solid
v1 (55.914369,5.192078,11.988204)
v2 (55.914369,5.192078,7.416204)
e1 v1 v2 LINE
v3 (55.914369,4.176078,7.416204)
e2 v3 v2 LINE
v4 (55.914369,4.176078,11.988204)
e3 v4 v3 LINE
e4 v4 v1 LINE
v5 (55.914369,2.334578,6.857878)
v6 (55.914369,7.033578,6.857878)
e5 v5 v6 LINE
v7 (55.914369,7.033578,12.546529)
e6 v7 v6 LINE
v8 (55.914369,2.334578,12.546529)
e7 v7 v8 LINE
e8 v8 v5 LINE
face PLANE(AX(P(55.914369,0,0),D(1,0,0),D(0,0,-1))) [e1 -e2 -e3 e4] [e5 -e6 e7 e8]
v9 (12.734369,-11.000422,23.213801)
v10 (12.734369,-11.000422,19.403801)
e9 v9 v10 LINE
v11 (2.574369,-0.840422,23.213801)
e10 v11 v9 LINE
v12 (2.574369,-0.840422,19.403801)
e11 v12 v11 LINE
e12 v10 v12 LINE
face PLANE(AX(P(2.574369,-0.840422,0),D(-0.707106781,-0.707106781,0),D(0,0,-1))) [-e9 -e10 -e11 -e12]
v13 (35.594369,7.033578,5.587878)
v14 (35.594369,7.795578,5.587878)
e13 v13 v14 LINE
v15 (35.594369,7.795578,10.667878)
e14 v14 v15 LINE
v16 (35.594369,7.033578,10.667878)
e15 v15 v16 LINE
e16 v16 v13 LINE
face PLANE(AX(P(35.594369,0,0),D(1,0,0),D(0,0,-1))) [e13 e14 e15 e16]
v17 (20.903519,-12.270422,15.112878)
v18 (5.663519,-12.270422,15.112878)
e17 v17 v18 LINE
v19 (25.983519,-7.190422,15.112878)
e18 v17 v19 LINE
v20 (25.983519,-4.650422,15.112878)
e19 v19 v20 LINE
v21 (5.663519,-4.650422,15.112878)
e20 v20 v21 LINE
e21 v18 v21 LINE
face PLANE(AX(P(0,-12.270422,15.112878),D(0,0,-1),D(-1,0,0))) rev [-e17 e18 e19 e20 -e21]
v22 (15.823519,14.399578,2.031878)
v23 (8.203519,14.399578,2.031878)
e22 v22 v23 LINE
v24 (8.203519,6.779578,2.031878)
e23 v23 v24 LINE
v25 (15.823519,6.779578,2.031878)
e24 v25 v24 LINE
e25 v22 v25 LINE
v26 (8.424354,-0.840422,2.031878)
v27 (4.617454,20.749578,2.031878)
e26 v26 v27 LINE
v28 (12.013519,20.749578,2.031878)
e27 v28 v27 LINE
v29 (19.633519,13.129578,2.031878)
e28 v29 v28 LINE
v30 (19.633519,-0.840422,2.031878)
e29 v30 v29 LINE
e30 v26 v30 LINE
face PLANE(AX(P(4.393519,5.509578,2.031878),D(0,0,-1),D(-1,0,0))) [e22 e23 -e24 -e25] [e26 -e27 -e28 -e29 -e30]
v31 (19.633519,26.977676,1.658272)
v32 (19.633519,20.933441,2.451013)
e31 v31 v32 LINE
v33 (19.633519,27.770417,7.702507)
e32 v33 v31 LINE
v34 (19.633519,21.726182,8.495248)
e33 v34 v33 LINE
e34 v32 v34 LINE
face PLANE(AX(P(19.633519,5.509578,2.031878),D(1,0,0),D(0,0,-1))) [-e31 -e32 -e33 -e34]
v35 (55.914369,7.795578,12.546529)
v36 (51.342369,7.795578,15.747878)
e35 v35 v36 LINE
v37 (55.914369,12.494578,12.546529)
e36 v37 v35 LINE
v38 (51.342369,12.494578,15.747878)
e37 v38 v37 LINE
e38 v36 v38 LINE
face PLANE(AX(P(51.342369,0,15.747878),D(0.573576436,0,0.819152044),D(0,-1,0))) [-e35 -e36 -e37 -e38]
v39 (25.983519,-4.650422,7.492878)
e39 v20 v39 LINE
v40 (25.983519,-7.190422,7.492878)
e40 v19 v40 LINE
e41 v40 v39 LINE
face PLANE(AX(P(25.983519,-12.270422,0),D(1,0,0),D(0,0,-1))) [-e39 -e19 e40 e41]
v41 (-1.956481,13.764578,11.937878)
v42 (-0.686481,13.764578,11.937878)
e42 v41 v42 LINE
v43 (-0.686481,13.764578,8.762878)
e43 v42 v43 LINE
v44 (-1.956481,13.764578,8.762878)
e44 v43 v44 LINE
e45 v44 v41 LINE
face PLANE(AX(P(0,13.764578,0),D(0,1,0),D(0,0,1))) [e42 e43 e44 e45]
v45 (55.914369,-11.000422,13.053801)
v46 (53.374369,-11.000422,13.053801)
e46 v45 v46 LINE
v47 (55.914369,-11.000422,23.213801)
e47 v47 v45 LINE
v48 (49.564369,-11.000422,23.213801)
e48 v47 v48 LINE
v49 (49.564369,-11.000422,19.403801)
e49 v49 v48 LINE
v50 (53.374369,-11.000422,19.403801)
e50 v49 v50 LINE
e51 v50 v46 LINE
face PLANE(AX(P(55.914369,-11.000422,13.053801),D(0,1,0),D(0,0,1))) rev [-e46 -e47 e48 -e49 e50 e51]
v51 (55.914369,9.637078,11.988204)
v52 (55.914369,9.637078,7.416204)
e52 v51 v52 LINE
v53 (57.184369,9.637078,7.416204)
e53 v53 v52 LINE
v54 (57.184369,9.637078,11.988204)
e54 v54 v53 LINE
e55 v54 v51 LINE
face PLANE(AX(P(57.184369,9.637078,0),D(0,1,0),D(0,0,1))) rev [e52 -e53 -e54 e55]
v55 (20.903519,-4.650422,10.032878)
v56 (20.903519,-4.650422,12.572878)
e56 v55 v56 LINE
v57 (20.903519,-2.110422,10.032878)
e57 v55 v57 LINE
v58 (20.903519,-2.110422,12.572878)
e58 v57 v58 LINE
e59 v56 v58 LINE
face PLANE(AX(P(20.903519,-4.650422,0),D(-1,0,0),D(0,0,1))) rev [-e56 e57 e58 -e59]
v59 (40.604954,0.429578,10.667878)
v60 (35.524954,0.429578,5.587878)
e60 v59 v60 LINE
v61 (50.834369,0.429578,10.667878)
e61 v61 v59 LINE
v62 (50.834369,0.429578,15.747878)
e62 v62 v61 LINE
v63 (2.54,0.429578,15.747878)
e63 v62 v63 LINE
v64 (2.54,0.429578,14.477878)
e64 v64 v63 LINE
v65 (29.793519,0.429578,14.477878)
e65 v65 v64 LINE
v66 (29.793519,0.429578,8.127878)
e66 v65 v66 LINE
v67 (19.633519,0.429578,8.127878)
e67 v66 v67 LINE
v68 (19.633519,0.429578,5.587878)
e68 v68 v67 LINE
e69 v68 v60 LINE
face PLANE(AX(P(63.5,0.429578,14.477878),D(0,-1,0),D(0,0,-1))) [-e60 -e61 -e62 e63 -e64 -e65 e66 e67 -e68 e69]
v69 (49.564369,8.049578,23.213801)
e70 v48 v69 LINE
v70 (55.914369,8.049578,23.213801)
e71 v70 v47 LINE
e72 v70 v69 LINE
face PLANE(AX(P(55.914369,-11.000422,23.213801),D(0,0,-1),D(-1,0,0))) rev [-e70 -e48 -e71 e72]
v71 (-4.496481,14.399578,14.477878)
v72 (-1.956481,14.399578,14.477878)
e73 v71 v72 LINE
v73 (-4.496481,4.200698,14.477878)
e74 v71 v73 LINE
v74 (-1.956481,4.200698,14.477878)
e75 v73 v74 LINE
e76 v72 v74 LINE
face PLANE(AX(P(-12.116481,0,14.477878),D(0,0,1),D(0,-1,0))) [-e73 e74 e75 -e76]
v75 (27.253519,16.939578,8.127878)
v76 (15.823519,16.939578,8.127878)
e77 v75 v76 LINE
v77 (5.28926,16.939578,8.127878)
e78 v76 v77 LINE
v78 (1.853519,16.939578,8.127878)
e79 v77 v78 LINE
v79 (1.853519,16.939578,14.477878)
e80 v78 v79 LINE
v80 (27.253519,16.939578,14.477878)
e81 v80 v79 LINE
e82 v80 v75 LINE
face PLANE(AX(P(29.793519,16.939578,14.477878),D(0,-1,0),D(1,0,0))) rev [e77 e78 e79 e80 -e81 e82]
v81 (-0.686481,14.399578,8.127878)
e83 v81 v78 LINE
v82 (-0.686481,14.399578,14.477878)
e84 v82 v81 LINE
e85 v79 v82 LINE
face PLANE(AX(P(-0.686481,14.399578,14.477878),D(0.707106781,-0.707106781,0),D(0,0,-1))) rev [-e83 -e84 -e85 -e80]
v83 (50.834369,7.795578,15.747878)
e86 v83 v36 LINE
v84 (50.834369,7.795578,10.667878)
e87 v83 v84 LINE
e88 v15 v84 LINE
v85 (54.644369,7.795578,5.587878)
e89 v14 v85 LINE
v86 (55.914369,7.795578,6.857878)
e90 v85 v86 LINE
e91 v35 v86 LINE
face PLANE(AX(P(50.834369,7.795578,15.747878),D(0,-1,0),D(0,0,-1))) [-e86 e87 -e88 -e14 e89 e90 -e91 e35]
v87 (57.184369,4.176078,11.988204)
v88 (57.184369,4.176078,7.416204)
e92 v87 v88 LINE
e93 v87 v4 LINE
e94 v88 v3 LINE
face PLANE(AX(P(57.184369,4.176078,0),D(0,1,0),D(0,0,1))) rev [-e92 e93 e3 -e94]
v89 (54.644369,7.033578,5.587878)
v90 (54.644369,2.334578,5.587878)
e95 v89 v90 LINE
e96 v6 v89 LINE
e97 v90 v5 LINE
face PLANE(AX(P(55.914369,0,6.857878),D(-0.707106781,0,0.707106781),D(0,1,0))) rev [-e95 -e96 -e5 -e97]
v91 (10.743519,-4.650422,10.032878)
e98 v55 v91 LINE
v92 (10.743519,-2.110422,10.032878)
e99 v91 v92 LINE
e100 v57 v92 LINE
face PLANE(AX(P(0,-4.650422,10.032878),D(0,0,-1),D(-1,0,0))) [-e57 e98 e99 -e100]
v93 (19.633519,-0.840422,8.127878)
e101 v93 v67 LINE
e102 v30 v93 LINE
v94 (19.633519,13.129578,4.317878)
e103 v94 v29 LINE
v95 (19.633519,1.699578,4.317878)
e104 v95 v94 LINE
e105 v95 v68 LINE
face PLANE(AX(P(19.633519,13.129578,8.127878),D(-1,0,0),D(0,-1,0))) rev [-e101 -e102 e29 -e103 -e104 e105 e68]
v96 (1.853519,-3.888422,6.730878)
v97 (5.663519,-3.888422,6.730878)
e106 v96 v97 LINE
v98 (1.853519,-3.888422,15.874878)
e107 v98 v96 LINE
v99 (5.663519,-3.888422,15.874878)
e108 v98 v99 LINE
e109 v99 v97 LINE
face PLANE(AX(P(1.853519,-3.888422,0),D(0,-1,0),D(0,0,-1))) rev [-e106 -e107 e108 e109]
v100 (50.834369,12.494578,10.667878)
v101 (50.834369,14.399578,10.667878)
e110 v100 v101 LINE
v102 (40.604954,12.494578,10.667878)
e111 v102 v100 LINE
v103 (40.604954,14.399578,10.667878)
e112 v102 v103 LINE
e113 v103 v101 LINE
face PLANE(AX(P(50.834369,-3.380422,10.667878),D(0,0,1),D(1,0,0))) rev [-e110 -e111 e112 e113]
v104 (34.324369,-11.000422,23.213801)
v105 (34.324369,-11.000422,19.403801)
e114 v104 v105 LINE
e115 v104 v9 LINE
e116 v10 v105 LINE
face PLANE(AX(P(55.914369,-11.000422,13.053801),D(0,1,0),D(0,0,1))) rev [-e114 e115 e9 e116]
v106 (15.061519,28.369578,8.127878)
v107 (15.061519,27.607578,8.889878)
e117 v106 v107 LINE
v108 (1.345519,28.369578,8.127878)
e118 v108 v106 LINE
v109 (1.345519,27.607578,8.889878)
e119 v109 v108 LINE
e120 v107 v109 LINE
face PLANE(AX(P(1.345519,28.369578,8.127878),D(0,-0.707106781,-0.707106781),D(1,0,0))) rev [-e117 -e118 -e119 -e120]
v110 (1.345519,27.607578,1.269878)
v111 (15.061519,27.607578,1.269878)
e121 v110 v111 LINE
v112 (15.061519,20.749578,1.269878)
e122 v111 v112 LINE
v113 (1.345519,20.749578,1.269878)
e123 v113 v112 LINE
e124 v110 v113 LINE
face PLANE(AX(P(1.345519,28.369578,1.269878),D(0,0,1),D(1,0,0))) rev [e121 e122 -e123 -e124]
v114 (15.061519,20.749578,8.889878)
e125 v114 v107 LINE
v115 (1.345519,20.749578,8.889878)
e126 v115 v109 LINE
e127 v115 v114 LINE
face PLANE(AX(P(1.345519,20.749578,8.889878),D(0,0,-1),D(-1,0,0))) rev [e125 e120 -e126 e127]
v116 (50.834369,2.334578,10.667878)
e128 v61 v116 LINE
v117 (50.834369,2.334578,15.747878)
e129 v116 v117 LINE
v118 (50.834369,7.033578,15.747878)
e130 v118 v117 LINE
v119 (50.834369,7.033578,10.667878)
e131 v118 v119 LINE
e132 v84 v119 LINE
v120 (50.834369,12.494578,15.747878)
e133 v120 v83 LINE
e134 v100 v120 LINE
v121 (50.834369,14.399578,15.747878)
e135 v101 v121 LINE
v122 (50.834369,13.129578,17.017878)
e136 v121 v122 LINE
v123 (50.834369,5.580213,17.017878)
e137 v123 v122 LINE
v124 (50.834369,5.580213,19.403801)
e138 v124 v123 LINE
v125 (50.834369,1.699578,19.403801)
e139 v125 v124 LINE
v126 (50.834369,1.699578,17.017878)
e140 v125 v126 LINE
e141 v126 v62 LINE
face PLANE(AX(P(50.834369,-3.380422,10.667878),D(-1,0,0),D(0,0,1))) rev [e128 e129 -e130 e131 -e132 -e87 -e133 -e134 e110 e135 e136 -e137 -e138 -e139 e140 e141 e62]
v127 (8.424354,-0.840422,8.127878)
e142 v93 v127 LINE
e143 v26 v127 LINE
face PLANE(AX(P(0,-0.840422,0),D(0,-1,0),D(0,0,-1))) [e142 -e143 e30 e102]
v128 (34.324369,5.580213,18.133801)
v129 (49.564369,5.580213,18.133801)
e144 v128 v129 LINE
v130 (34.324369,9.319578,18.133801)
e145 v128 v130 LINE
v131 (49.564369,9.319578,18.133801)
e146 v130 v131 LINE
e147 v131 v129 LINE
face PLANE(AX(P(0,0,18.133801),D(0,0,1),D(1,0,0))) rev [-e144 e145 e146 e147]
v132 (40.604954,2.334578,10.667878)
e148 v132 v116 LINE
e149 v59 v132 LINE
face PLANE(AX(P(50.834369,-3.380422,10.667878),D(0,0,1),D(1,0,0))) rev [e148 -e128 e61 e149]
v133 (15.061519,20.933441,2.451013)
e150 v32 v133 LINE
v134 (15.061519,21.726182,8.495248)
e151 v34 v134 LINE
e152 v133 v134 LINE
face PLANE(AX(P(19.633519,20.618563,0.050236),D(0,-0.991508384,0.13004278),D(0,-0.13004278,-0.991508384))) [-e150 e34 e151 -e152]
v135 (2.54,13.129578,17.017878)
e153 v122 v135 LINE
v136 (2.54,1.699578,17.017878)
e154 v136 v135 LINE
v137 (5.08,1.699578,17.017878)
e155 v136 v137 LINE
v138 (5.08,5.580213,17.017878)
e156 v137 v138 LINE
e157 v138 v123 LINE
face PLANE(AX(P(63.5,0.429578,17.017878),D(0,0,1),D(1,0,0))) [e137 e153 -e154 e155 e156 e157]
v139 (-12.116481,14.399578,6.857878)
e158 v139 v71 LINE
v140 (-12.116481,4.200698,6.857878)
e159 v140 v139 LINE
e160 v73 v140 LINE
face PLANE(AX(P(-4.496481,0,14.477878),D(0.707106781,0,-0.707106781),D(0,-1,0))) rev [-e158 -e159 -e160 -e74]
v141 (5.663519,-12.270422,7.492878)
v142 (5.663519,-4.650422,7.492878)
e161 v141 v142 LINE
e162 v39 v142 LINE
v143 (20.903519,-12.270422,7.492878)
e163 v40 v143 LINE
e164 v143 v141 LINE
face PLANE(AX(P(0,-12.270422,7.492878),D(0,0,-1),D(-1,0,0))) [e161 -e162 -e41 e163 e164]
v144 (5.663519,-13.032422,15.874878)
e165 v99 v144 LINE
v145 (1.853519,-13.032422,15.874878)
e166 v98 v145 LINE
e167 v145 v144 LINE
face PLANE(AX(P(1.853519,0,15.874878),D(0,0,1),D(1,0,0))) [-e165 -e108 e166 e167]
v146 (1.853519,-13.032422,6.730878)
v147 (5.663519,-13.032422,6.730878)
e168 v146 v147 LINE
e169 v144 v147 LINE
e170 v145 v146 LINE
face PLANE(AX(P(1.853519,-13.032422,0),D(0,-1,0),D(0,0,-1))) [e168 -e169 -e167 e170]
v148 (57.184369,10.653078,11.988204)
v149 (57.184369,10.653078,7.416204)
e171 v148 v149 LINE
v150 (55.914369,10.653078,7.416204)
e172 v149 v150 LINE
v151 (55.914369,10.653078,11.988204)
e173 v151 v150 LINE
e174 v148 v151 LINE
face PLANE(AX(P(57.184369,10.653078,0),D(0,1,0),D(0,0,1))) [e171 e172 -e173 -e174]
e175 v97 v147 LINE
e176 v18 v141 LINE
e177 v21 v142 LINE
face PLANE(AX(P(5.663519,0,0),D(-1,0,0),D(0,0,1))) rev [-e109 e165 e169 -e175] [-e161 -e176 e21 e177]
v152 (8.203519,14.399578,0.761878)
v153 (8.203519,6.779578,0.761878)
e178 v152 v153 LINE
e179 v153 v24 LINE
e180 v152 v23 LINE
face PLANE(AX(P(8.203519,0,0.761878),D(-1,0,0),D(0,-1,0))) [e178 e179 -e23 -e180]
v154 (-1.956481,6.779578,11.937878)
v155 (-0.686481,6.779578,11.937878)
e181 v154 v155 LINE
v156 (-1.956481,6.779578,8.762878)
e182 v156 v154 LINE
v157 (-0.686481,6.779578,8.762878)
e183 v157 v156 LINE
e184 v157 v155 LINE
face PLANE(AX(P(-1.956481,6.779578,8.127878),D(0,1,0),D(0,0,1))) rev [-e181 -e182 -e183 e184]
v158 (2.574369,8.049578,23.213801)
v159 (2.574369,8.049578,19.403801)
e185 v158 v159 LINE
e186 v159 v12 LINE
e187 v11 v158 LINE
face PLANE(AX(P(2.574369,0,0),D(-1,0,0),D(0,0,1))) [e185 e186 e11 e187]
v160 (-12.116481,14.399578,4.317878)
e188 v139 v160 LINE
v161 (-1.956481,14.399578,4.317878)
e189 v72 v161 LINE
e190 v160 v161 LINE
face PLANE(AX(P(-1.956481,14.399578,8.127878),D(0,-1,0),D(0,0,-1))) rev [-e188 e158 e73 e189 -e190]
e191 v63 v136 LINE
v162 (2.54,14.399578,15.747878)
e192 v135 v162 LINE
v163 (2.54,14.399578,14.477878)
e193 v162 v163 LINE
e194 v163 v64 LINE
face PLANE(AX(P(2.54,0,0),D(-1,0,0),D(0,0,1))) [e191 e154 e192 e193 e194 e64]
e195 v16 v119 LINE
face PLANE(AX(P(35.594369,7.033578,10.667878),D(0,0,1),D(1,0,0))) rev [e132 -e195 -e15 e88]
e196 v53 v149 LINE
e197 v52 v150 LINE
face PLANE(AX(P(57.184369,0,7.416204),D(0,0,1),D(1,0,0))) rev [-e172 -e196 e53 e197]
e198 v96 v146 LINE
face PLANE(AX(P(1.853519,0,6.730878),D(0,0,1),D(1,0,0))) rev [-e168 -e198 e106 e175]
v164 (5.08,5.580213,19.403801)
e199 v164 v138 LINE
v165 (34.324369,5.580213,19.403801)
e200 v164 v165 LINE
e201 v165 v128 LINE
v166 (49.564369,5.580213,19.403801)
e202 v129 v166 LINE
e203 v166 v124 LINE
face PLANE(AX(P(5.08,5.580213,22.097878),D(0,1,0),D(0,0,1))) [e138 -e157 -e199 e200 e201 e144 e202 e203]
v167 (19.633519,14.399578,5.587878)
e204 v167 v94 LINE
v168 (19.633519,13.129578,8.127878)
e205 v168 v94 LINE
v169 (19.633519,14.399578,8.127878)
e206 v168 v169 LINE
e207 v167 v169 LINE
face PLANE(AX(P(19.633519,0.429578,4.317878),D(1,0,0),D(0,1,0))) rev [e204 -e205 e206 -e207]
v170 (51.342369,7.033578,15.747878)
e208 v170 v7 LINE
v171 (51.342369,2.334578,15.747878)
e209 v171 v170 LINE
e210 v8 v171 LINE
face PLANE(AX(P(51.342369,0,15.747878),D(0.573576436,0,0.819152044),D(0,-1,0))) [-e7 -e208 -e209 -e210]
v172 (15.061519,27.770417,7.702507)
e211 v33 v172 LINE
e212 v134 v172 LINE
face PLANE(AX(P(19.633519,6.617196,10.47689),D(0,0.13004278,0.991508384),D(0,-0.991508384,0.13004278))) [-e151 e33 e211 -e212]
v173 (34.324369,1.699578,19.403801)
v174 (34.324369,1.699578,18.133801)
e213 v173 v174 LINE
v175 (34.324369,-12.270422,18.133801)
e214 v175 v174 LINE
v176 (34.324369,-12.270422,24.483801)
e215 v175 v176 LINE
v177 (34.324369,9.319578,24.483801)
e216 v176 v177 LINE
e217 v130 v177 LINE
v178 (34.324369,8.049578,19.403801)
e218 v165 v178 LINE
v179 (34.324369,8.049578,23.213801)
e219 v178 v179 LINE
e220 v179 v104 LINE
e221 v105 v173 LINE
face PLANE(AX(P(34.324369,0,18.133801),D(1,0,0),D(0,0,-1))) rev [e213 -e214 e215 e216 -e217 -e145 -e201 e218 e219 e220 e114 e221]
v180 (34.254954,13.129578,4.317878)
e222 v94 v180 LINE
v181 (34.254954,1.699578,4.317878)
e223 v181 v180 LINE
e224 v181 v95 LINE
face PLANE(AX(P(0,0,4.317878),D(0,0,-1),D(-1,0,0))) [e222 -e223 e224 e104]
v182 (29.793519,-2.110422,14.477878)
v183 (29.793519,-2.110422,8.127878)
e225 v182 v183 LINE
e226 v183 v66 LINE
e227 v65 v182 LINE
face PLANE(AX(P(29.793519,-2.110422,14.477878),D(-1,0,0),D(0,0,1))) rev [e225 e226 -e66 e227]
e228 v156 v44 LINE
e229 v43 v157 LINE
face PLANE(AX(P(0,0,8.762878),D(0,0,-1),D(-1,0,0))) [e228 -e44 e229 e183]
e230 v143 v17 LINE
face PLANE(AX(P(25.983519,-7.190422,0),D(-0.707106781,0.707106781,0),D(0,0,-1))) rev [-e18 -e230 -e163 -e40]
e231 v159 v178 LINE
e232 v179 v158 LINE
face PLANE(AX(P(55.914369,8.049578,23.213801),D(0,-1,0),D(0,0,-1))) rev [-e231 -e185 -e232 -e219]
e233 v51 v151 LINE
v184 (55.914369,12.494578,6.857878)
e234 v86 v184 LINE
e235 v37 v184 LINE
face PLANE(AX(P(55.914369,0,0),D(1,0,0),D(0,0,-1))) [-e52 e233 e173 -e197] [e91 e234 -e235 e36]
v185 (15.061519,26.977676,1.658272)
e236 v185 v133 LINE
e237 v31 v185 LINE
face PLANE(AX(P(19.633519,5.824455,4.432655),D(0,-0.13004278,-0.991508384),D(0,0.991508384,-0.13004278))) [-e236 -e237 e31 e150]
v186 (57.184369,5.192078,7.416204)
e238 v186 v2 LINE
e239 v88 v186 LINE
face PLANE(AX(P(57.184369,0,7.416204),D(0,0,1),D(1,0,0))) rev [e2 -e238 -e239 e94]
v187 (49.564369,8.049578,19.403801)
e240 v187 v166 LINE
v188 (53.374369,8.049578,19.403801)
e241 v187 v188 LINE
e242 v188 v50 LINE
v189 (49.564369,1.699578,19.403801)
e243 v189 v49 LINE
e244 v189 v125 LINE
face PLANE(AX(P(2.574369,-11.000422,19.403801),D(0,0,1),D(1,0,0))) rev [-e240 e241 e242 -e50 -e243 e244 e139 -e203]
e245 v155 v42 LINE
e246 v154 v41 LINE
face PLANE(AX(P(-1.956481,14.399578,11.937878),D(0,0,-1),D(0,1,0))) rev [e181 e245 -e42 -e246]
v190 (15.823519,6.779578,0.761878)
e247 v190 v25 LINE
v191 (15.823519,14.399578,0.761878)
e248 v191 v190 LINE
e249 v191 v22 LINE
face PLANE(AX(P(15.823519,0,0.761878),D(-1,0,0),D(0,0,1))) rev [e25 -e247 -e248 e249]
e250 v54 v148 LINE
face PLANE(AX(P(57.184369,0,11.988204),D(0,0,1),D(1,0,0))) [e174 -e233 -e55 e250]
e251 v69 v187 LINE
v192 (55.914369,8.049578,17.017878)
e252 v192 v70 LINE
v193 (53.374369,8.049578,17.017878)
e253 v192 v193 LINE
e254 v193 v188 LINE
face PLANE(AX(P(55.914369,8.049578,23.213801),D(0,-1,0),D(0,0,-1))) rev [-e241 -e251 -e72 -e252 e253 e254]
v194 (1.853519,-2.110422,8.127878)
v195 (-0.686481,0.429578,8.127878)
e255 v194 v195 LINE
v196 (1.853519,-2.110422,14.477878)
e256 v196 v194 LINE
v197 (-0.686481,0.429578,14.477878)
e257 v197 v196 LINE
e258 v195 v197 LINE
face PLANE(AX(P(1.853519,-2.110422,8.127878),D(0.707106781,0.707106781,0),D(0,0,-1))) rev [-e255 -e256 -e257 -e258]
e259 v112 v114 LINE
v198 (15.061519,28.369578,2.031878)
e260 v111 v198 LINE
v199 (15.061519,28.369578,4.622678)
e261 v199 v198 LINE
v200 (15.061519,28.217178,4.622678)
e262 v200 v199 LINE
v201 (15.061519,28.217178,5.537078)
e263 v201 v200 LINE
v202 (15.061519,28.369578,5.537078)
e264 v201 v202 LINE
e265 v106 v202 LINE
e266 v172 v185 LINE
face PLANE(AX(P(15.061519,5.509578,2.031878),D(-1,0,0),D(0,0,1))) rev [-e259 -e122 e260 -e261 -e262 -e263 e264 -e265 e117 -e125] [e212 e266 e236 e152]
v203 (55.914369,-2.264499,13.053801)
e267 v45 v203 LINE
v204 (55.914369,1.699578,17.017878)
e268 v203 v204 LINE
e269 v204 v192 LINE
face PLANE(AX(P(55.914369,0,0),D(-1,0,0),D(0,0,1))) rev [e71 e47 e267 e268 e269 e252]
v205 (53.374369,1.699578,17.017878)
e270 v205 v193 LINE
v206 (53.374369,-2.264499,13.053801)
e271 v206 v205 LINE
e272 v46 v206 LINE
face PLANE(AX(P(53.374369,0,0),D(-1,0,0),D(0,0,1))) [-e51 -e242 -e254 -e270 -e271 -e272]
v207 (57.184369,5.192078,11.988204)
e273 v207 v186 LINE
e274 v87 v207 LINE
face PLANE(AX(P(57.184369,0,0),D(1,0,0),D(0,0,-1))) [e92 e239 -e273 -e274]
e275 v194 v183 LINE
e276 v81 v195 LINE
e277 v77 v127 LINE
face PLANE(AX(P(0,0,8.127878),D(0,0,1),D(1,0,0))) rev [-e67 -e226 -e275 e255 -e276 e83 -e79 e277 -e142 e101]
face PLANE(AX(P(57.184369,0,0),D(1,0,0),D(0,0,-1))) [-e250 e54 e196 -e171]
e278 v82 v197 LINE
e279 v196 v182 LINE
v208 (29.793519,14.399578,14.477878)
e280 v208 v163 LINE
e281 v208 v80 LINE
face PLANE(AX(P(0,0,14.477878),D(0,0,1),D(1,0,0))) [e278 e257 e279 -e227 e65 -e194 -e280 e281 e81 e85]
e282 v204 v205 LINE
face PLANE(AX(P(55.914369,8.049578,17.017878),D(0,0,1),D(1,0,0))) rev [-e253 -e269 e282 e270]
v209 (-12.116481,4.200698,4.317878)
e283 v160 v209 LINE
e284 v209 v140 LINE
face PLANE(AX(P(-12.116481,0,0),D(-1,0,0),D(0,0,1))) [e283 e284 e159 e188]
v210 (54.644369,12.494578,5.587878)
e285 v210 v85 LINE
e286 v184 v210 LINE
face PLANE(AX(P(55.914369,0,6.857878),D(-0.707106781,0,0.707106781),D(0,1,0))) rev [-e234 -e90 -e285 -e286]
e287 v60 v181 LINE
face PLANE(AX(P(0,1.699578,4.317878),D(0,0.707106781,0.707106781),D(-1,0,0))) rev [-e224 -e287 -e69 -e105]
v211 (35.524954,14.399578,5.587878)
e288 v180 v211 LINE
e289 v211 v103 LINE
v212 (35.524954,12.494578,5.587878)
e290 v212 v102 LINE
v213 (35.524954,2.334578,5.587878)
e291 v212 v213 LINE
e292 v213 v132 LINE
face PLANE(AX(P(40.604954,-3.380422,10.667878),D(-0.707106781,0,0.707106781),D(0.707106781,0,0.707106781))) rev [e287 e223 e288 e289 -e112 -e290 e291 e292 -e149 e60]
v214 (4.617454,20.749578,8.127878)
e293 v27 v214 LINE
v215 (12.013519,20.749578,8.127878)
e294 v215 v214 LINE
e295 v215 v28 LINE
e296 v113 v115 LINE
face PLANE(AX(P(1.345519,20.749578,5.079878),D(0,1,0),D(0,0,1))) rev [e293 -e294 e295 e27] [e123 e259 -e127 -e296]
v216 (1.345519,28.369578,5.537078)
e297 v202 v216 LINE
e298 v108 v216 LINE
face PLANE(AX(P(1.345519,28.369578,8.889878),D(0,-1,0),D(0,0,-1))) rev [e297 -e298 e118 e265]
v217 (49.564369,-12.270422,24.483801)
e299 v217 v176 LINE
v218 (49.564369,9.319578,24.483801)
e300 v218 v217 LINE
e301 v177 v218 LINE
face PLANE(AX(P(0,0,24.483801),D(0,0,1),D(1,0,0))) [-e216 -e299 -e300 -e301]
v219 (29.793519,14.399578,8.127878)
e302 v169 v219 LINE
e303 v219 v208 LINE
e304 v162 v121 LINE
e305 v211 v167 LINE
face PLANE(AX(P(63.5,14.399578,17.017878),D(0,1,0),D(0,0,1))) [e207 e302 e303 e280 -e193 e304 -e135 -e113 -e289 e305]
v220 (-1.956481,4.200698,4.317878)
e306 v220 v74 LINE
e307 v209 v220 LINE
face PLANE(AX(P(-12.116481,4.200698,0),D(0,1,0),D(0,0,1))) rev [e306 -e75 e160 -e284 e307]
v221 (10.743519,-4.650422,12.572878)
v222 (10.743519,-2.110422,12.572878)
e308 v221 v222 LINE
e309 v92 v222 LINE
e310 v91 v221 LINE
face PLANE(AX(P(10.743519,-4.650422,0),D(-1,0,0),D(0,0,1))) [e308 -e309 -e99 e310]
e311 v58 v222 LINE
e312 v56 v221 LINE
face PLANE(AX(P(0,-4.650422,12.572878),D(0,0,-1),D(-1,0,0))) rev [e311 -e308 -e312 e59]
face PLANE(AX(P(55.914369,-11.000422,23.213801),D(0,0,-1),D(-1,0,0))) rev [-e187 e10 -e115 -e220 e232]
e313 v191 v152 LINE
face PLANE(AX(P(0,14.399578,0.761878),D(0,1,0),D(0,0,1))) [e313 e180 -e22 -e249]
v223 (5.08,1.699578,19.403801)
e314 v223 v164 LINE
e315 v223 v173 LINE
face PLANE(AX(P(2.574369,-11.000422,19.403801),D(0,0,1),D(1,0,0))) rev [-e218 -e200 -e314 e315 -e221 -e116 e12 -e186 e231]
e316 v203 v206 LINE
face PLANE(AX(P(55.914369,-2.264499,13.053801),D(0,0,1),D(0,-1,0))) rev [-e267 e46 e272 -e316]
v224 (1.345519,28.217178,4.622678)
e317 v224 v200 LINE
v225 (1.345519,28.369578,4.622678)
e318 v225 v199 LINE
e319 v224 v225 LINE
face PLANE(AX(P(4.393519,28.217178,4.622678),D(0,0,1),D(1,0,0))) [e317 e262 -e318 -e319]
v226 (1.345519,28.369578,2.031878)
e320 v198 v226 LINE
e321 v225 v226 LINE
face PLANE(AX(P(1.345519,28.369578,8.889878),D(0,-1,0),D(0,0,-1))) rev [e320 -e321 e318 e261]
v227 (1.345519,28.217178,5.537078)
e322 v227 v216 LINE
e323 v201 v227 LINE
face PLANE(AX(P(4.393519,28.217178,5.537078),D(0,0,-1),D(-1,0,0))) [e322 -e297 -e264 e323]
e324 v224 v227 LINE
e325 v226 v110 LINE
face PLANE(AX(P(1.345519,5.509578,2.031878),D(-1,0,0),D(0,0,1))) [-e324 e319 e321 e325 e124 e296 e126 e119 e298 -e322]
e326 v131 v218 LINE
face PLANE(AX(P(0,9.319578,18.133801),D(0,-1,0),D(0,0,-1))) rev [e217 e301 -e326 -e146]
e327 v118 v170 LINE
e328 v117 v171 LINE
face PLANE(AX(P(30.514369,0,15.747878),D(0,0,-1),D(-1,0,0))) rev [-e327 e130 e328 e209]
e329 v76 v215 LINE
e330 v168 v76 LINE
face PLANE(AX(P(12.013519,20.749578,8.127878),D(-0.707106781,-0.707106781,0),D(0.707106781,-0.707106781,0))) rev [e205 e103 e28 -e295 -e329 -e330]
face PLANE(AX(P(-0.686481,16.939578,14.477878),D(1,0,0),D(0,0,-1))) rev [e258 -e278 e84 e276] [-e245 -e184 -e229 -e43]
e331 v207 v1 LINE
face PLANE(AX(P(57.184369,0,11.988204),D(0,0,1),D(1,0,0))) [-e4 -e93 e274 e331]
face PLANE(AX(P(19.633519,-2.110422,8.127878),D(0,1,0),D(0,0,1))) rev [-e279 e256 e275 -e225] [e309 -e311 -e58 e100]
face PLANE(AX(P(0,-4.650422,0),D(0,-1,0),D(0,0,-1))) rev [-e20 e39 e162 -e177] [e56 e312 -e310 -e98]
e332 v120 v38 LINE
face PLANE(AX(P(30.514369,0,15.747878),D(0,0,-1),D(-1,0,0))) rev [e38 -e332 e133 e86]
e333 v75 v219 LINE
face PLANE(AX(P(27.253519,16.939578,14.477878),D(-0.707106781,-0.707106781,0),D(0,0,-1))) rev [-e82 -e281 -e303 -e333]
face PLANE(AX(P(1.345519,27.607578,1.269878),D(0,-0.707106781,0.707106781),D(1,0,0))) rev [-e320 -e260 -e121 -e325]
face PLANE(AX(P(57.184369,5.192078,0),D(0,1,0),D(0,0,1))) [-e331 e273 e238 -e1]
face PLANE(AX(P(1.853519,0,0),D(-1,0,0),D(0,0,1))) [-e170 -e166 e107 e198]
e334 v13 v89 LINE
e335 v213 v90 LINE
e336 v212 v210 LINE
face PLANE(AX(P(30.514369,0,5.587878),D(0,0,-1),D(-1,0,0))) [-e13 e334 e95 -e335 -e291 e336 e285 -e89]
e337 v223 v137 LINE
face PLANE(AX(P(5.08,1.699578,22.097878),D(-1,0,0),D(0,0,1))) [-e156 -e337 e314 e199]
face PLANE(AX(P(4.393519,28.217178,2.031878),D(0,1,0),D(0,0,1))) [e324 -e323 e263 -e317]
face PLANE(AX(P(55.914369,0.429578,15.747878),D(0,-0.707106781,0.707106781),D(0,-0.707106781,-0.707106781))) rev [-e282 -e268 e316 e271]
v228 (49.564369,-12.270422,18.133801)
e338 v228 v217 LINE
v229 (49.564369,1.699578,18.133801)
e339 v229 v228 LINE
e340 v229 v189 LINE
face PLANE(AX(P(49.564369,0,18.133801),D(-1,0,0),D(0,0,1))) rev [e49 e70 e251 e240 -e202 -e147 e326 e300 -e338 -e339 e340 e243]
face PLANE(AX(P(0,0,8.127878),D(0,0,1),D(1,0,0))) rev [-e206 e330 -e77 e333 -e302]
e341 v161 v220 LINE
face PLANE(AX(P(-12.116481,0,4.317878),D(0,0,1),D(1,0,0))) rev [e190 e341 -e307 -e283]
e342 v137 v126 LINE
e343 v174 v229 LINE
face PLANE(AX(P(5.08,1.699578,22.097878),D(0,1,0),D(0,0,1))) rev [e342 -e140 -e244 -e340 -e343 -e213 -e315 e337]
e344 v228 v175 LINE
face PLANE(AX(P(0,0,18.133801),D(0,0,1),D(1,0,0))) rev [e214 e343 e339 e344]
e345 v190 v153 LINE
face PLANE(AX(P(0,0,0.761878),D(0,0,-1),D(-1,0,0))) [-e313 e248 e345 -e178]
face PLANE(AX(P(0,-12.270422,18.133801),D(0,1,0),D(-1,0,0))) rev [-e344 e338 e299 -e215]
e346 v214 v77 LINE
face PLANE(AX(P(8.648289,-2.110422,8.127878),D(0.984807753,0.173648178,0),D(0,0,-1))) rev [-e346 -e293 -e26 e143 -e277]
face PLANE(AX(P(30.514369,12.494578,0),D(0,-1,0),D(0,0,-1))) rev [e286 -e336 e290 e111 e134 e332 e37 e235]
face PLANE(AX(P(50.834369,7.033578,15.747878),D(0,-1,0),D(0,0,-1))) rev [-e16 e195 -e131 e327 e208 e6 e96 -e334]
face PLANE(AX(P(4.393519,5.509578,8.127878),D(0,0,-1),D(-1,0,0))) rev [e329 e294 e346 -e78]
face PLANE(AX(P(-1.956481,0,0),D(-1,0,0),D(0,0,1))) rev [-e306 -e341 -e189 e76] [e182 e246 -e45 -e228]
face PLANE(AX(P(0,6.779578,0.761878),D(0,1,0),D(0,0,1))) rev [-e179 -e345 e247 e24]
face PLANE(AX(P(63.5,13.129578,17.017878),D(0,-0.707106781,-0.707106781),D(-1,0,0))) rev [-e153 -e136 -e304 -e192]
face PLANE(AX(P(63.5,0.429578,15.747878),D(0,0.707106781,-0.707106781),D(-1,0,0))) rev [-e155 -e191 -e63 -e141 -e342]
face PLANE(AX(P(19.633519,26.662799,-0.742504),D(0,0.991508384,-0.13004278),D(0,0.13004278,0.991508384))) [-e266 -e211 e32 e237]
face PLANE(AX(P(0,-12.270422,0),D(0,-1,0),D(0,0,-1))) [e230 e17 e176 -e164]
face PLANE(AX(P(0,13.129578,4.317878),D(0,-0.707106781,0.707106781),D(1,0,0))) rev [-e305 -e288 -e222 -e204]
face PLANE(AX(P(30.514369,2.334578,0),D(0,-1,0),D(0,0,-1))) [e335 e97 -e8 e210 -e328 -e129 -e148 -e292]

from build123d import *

# Parameters (mm, degrees)
BOSS_EXTRUDE1_DEPTH       = 10.16
BOSS_EXTRUDE2_DEPTH       = 5.08
BOSS_EXTRUDE2_DEPTH_BACK  = 17.78
CHAMFER1_SIZE             = 1.27
BOSS_EXTRUDE3_DEPTH       = 7.62
CUT_EXTRUDE1_DEPTH        = 0.254
SCALE1_SCALE              = 0.6
CHAMFER3_SIZE             = 24.13
CHAMFER3_SIZE_2           = 4.254770044
BOSS_EXTRUDE7_DEPTH       = 6.35
CHAMFER4_SIZE             = 2.54
SKETCH9_W                 = 10.985229955
SKETCH9_H                 = 6.096
SKETCH9_W_2               = 4.255191267
CUT_EXTRUDE4_DEPTH        = 1.27
BOSS_EXTRUDE8_DEPTH       = 63.5
SKETCH12_W                = 0.141876601
SKETCH12_H                = 13.97
SKETCH12_W_2              = 2.398123399
CUT_EXTRUDE7_DEPTH        = 2.54
CHAMFER5_SIZE             = 1.27
SKETCH14_W                = 3.81
SKETCH14_H                = 7.62
BOSS_EXTRUDE9_DEPTH       = 1.27
SKETCH15_W                = 3.81
SKETCH15_H                = 7.62
BOSS_EXTRUDE10_DEPTH      = 10.16
SKETCH16_W                = 1.27
SKETCH16_H                = 7.62
CUT_EXTRUDE8_DEPTH        = 0.635
SKETCH17_W                = 1.27
SKETCH17_H                = 3.175
CUT_EXTRUDE9_DEPTH        = 0.635
CHAMFER6_SIZE             = 7.62
BOSS_EXTRUDE11_DEPTH      = 6.35
SKETCH19_W                = 43.866481186
SKETCH19_H                = 13.97
BOSS_EXTRUDE12_DEPTH      = 10.16
CHAMFER7_SIZE             = 1.27
SKETCH20_W                = 12.665631385
SKETCH20_H                = 5.08
SKETCH20_H_2              = 1.237744284
CUT_EXTRUDE12_DEPTH       = 17.78
SKETCH6_W                 = 7.62
SKETCH6_H                 = 7.62
BOSS_EXTRUDE13_DEPTH      = 1.27
SKETCH21_W                = 12.665631385
SKETCH21_H                = 6.35
CUT_EXTRUDE14_DEPTH       = 17.78
CUT_EXTRUDE15_DEPTH       = 17.78
BOSS_EXTRUDE14_DEPTH      = 2.54
SKETCH25_W                = 3.81
SKETCH25_H                = 19.05
BOSS_EXTRUDE15_DEPTH      = 50.8
CHAMFER8_SIZE             = 10.16
SKETCH26_W                = 45.754368615
SKETCH26_H                = 3.880635149
BOSS_EXTRUDE18_DEPTH      = 5.08
BOSS_EXTRUDE19_DEPTH      = 1.27
BOSS_EXTRUDE19_DEPTH_BACK = 5.08
SKETCH27_W                = 15.24
SKETCH27_H                = 19.05
SKETCH27_H_2              = 1.27
SKETCH28_W                = 10.16
SKETCH28_H                = 1.27
BOSS_EXTRUDE20_DEPTH      = 2.54
SKETCH29_W                = 20.32
SKETCH29_H                = 7.62
BOSS_EXTRUDE21_DEPTH      = 7.62
CHAMFER9_SIZE             = 5.08
SKETCH30_W                = 7.62
SKETCH30_H                = 7.62
BOSS_EXTRUDE22_DEPTH      = 3.81
BOSS_EXTRUDE24_DEPTH      = 5.08
BOSS_EXTRUDE24_DEPTH_BACK = 20.32
SKETCH31_W                = 5.08
SKETCH31_H                = 10.16
SKETCH32_W                = 10.16
SKETCH32_H                = 0.762
CUT_EXTRUDE16_DEPTH       = 5.08
SKETCH33_W                = 5.08
SKETCH33_H                = 0.762
CUT_EXTRUDE17_DEPTH       = 15.24
CHAMFER10_SIZE            = 4.572
CHAMFER10_SIZE2           = 3.201348865
CHAMFER11_SIZE            = 3.201348865
CHAMFER11_SIZE2           = 4.572
CHAMFER12_SIZE            = 1.27
BOSS_EXTRUDE25_DEPTH      = 1.27


with BuildPart() as part:
    # Sketch1 → Boss-Extrude1 (new body)
    with BuildSketch(Plane.XY):
        Polygon((0, 0), (0, 25.4), (12.7, 25.4), (25.4, 12.7), (25.4, 0), (25.4, -12.7), (0, -12.7), align=None)
    extrude(amount=BOSS_EXTRUDE1_DEPTH)

    # Sketch2 → Boss-Extrude2 (add, two sides: drawn at the far end of the back side and taken through both)
    with BuildSketch(Plane.ZY.offset(-BOSS_EXTRUDE2_DEPTH_BACK)):
        Polygon((5.08, 25.4), (11.43, 25.4), (11.43, 38.1), (-1.27, 38.1), (-1.27, 25.4), align=None)
    extrude(amount=BOSS_EXTRUDE2_DEPTH + BOSS_EXTRUDE2_DEPTH_BACK)

    # Chamfer1
    chamfer1_edges = [part.edges().sort_by_distance(p)[0] for p in [
        (6.35, 38.1, 11.43),
        (6.35, 38.1, -1.27),
    ]]
    chamfer(chamfer1_edges, length=CHAMFER1_SIZE)

    # Sketch3 → Boss-Extrude3 (add)
    with BuildSketch(Plane(origin=(17.78, 0, 0), x_dir=(0, 0, -1), z_dir=(1, 0, 0))):
        Polygon((-10.772282393, 27.027673315), (-9.451047753, 37.101398496), (0.622677429, 35.780163856), (-0.698557212, 25.706438674), align=None)
    extrude(amount=BOSS_EXTRUDE3_DEPTH)

    # Sketch4 → Cut-Extrude1 (cut)
    with BuildSketch(Plane(origin=(0, 38.1, 0), x_dir=(1, 0, 0), z_dir=(0, 1, 0))):
        Polygon((-5.08, -5.842), (17.78, -5.842), (17.78, -4.318), (-5.08, -4.318), (-5.08, -5.08), align=None)
    extrude(amount=-CUT_EXTRUDE1_DEPTH, mode=Mode.SUBTRACT)


with BuildPart() as part_1:
    # Scale1: scaled about (10.983797036, 13.773944281, 5.079695833)
    add(part.part.scale(SCALE1_SCALE).moved(Location((4.393518814, 5.509577712, 2.031878333))))

    # Chamfer3
    # the kernel refuses this chamfer: 24.13, 4.254770044 mm, written as the material it takes off along each edge
    with BuildSketch(Plane(origin=(4.393518814, -2.110422288, -60.670862824), x_dir=(-0.006682531656101754, 0.9999776716360547, 0), z_dir=(0, 0, 1))) as chamfer3_piece_1_section:
        Polygon((CHAMFER3_SIZE * 0.999977671636, -CHAMFER3_SIZE * 0.0066825316561), (-CHAMFER3_SIZE_2 * 0.00668253165688, -CHAMFER3_SIZE_2 * 0.999977671752), (0, 0), align=None)
    chamfer3_piece_1 = extrude(amount=131.501482315, mode=Mode.PRIVATE)
    chamfer3_piece_1 = split(chamfer3_piece_1, bisect_by=Plane(origin=(5.574307044, 20.749577712, 5.079878333), z_dir=(0, -1, 0)), keep=Keep.TOP, mode=Mode.PRIVATE)
    add(chamfer3_piece_1, mode=Mode.SUBTRACT)

    # Sketch8 → Boss-Extrude7 (add)
    with BuildSketch(Plane.XY.offset(8.127878333)):
        Polygon((19.633518814, -2.110422288), (29.793518814, -2.110422288), (29.793518814, 16.939577712), (-0.686481186, 16.939577712), (-0.686481186, -2.110422288), align=None)
    extrude(amount=BOSS_EXTRUDE7_DEPTH)

    # Chamfer4
    chamfer4_edges = [part_1.edges().sort_by_distance(p)[0] for p in [
        (-0.686481186, -2.110422288, 11.302878333),
        (29.793518814, -2.110422288, 11.302878333),
        (29.793518814, 16.939577712, 11.302878333),
        (-0.686481186, 16.939577712, 11.302878333),
    ]]
    chamfer(chamfer4_edges, length=CHAMFER4_SIZE)

    # Sketch9 → Cut-Extrude4 (cut)
    with BuildSketch(Plane.XZ.offset(2.110422288)):
        with Locations((14.140903837, 5.079878333)):
            Rectangle(SKETCH9_W, SKETCH9_H)
        with Locations((6.520693226, 5.079878333)):
            Rectangle(SKETCH9_W_2, SKETCH9_H)
    extrude(amount=-CUT_EXTRUDE4_DEPTH, mode=Mode.SUBTRACT)

    # Sketch10 → Boss-Extrude8 (add)
    with BuildSketch(Plane.ZY):
        Polygon((14.477878333, 14.399577712), (14.477878333, 0.429577712), (17.017878333, 0.429577712), (17.017878333, 14.399577712), (14.861111331, 14.399577712), align=None)
    extrude(amount=-BOSS_EXTRUDE8_DEPTH)

    # Sketch12 → Cut-Extrude7 (cut)
    with BuildSketch(Plane.ZY):
        with Locations((14.548816634, 7.414577712)):
            Rectangle(SKETCH12_W, SKETCH12_H)
        with Locations((15.818816634, 7.414577712)):
            Rectangle(SKETCH12_W_2, SKETCH12_H)
    extrude(amount=-CUT_EXTRUDE7_DEPTH, mode=Mode.SUBTRACT)

    # Chamfer5
    chamfer5_edges = [part_1.edges().sort_by_distance(p)[0] for p in [
        (33.02, 14.399577712, 17.017878333),
        (33.02, 0.429577712, 17.017878333),
    ]]
    chamfer(chamfer5_edges, length=CHAMFER5_SIZE)

    # Sketch14 → Boss-Extrude9 (add)
    with BuildSketch(Plane.ZY.offset(0.686481186)):
        with Locations((10.032878333, 10.589577712)):
            Rectangle(SKETCH14_W, SKETCH14_H)
    extrude(amount=BOSS_EXTRUDE9_DEPTH)

    # Sketch15 → Boss-Extrude10 (add)
    with BuildSketch(Plane.ZY.offset(1.956481186)):
        Polygon((11.937878333, 4.200697775), (11.937878333, 6.779577712), (8.127878333, 6.779577712), (8.127878333, 14.399577712), (4.317878333, 14.399577712), (4.317878333, 4.200697775), align=None)
        with Locations((10.032878333, 10.589577712)):
            Rectangle(SKETCH15_W, SKETCH15_H)
        Polygon((14.477878333, 14.399577712), (14.477878333, 4.200697775), (11.937878333, 4.200697775), (11.937878333, 6.779577712), (11.937878333, 14.399577712), align=None)
    extrude(amount=BOSS_EXTRUDE10_DEPTH)

    # Sketch16 → Cut-Extrude8 (cut)
    with BuildSketch(Plane(origin=(0, 0, 8.127878333), x_dir=(-1, 0, 0), z_dir=(0, 0, -1))):
        with Locations((1.321481186, 10.589577712)):
            Rectangle(SKETCH16_W, SKETCH16_H)
    extrude(amount=-CUT_EXTRUDE8_DEPTH, mode=Mode.SUBTRACT)

    # Sketch17 → Cut-Extrude9 (cut)
    with BuildSketch(Plane(origin=(0, 14.399577712, 0), x_dir=(1, 0, 0), z_dir=(0, 1, 0))):
        with Locations((-1.321481186, -10.350378333)):
            Rectangle(SKETCH17_W, SKETCH17_H)
    extrude(amount=-CUT_EXTRUDE9_DEPTH, mode=Mode.SUBTRACT)

    # Chamfer6
    chamfer6_edges = [part_1.edges().sort_by_distance(p)[0] for p in [
        (-12.116481186, 9.300137744, 14.477878333),
    ]]
    chamfer(chamfer6_edges, length=CHAMFER6_SIZE)

    # Sketch18 → Boss-Extrude11 (add)
    with BuildSketch(Plane(origin=(0, 0, 8.127878333), x_dir=(-1, 0, 0), z_dir=(0, 0, -1))):
        Polygon((-27.253518814, -2.110422288), (-29.793518814, 0.429577712), (-29.793518814, -2.110422288), align=None)
    extrude(amount=-BOSS_EXTRUDE11_DEPTH)

    # Sketch19 → Boss-Extrude12 (add)
    with BuildSketch(Plane(origin=(0, 0, 14.477878333), x_dir=(-1, 0, 0), z_dir=(0, 0, -1))):
        with Locations((-41.566759407, 7.414577712)):
            Rectangle(SKETCH19_W, SKETCH19_H)
    extrude(amount=BOSS_EXTRUDE12_DEPTH)

    # Chamfer7
    chamfer7_edges = [part_1.edges().sort_by_distance(p)[0] for p in [
        (41.566759407, 14.399577712, 4.317878333),
        (41.566759407, 0.429577712, 4.317878333),
    ]]
    chamfer(chamfer7_edges, length=CHAMFER7_SIZE)

    # Sketch20 → Cut-Extrude12 (cut)
    with BuildSketch(Plane(origin=(0, 14.399577712, 0), x_dir=(1, 0, 0), z_dir=(0, 1, 0))):
        Polygon((63.5, -1.736490395), (63.5, -4.350134049), (50.834368615, -4.350134049), (44.484368615, -4.350134049), (41.857380808, -1.736490395), align=None)
        with Locations((57.167184308, -8.127878333)):
            Rectangle(SKETCH20_W, SKETCH20_H)
        Polygon((50.834368615, -4.350134049), (44.484368615, -4.350134049), (45.728432296, -5.587878333), (50.834368615, -5.587878333), align=None)
        Polygon((50.834368615, -5.587878333), (45.728432296, -5.587878333), (50.834368615, -10.667878333), align=None)
        with Locations((57.167184308, -4.969006191)):
            Rectangle(SKETCH20_W, SKETCH20_H_2)
    extrude(amount=-CUT_EXTRUDE12_DEPTH, mode=Mode.SUBTRACT)

    # Sketch6 → Boss-Extrude13 (add)
    with BuildSketch(Plane(origin=(0, 0, 2.031878333), x_dir=(-1, 0, 0), z_dir=(0, 0, -1))):
        with Locations((-12.013518814, 10.589577712)):
            Rectangle(SKETCH6_W, SKETCH6_H)
    extrude(amount=BOSS_EXTRUDE13_DEPTH)

    # Sketch21 → Cut-Extrude14 (cut)
    with BuildSketch(Plane(origin=(0, 14.399577712, 0), x_dir=(1, 0, 0), z_dir=(0, 1, 0))):
        with Locations((57.167184308, -13.842878333)):
            Rectangle(SKETCH21_W, SKETCH21_H)
    extrude(amount=-CUT_EXTRUDE14_DEPTH, mode=Mode.SUBTRACT)

    # Sketch22 → Cut-Extrude15 (cut)
    with BuildSketch(Plane(origin=(0, 14.399577712, 0), x_dir=(1, 0, 0), z_dir=(0, 1, 0))):
        Polygon((50.834368615, -10.667878333), (40.604954359, -10.667878333), (33.066219798, -3.129143772), (50.834368615, -3.464094762), align=None)
    extrude(amount=-CUT_EXTRUDE15_DEPTH, mode=Mode.SUBTRACT)



with BuildPart() as body_2:
    # Sketch24 → Boss-Extrude14 (new body)
    with BuildSketch(Plane(origin=(53.374368615, 0, 0), x_dir=(0, 0, -1), z_dir=(1, 0, 0))):
        Polygon((-15.747878333, 0.429577712), (-13.053801497, -2.264499124), (-13.053801497, -11.000422288), (-23.213801497, -11.000422288), (-23.213801497, 8.049577712), (-17.017878333, 8.049577712), (-17.017878333, 1.699577712), align=None)
    extrude(amount=BOSS_EXTRUDE14_DEPTH)

    # Sketch25 → Boss-Extrude15 (add)
    with BuildSketch(Plane.ZY.offset(-53.374368615)):
        with Locations((21.308801497, -1.475422288)):
            Rectangle(SKETCH25_W, SKETCH25_H)
    extrude(amount=BOSS_EXTRUDE15_DEPTH)

    # Chamfer8
    chamfer8_edges = [body_2.edges().sort_by_distance(p)[0] for p in [
        (2.574368615, -11.000422288, 21.308801497),
    ]]
    chamfer(chamfer8_edges, length=CHAMFER8_SIZE)


with BuildPart() as part_2:
    add(part_1.part)

    add(body_2.part)  # Boss-Extrude18 merges body 2
    # Sketch26 → Boss-Extrude18 (add)
    with BuildSketch(Plane.XY.offset(17.017878333)):
        with Locations((27.957184308, 3.639895287)):
            Rectangle(SKETCH26_W, SKETCH26_H)
    extrude(amount=BOSS_EXTRUDE18_DEPTH)

    # Sketch27 → Boss-Extrude19 (add, two sides: drawn at the far end of the back side and taken through both)
    with BuildSketch(Plane.XY.offset(23.213801497).offset(-BOSS_EXTRUDE19_DEPTH_BACK)):
        with Locations((41.944368615, -1.475422288)):
            Rectangle(SKETCH27_W, SKETCH27_H)
        with Locations((41.944368615, 8.684577712)):
            Rectangle(SKETCH27_W, SKETCH27_H_2)
        with Locations((41.944368615, -11.635422288)):
            Rectangle(SKETCH27_W, SKETCH27_H_2)
    extrude(amount=BOSS_EXTRUDE19_DEPTH + BOSS_EXTRUDE19_DEPTH_BACK)

    # Sketch28 → Boss-Extrude20 (add)
    with BuildSketch(Plane.XZ.offset(2.110422288)):
        with Locations((15.823518814, 11.937878333)):
            Rectangle(SKETCH28_W, SKETCH28_H)
        with Locations((15.823518814, 10.667878333)):
            Rectangle(SKETCH28_W, SKETCH28_H)
    extrude(amount=BOSS_EXTRUDE20_DEPTH)

    # Sketch29 → Boss-Extrude21 (add)
    with BuildSketch(Plane(origin=(0, -4.650422288, 0), x_dir=(-1, 0, 0), z_dir=(0, -1, 0))):
        with Locations((-15.823518814, -11.302878333)):
            Rectangle(SKETCH29_W, SKETCH29_H)
    extrude(amount=BOSS_EXTRUDE21_DEPTH)

    # Chamfer9
    chamfer9_edges = [part_2.edges().sort_by_distance(p)[0] for p in [
        (25.983518814, -12.270422288, 11.302878333),
    ]]
    chamfer(chamfer9_edges, length=CHAMFER9_SIZE)

    # Sketch30 → Boss-Extrude22 (add)
    with BuildSketch(Plane.ZY.offset(-5.663518814)):
        Polygon((7.492878333, -13.032422288), (7.492878333, -12.270422288), (7.492878333, -4.650422288), (15.112878333, -4.650422288), (15.112878333, -3.888422288), (6.730878333, -3.888422288), (6.730878333, -13.032422288), align=None)
        Polygon((15.112878333, -12.270422288), (7.492878333, -12.270422288), (7.492878333, -13.032422288), (15.874878333, -13.032422288), (15.874878333, -3.888422288), (15.112878333, -3.888422288), (15.112878333, -4.650422288), align=None)
        with Locations((11.302878333, -8.460422288)):
            Rectangle(SKETCH30_W, SKETCH30_H)
    extrude(amount=BOSS_EXTRUDE22_DEPTH)

    # Sketch31 → Boss-Extrude24 (add, two sides: drawn at the far end of the back side and taken through both)
    with BuildSketch(Plane(origin=(50.834368615, 0, 0), x_dir=(0, 0, -1), z_dir=(1, 0, 0)).offset(-BOSS_EXTRUDE24_DEPTH_BACK)):
        with Locations((-8.127878333, 7.414577712)):
            Rectangle(SKETCH31_W, SKETCH31_H)
        with Locations((-13.207878333, 7.414577712)):
            Rectangle(SKETCH31_W, SKETCH31_H)
    extrude(amount=BOSS_EXTRUDE24_DEPTH + BOSS_EXTRUDE24_DEPTH_BACK)

    # Sketch32 → Cut-Extrude16 (cut)
    with BuildSketch(Plane(origin=(55.914368615, 0, 0), x_dir=(0, 0, -1), z_dir=(1, 0, 0))):
        with Locations((-10.667878333, 7.414577712)):
            Rectangle(SKETCH32_W, SKETCH32_H)
    extrude(amount=-CUT_EXTRUDE16_DEPTH, mode=Mode.SUBTRACT)

    # Sketch33 → Cut-Extrude17 (cut)
    with BuildSketch(Plane(origin=(50.834368615, 0, 0), x_dir=(0, 0, -1), z_dir=(1, 0, 0))):
        with Locations((-8.127878333, 7.414577712)):
            Rectangle(SKETCH33_W, SKETCH33_H)
    extrude(amount=-CUT_EXTRUDE17_DEPTH, mode=Mode.SUBTRACT)

    # Chamfer10
    chamfer10_edges = [part_2.edges().sort_by_distance(p)[0] for p in [
        (55.914368615, 4.684077712, 15.747878333),
    ]]
    chamfer10_side = [part_2.faces().sort_by_distance(p)[0] for p in [
        (53.374368615, 4.684077712, 15.747878333),
    ]]
    chamfer(chamfer10_edges, length=CHAMFER10_SIZE, length2=CHAMFER10_SIZE2, reference=chamfer10_side[0])

    # Chamfer11
    chamfer11_edges = [part_2.edges().sort_by_distance(p)[0] for p in [
        (55.914368615, 10.145077712, 15.747878333),
    ]]
    chamfer11_side = [part_2.faces().sort_by_distance(p)[0] for p in [
        (55.914368615, 10.145077712, 10.667878333),
    ]]
    chamfer(chamfer11_edges, length=CHAMFER11_SIZE, length2=CHAMFER11_SIZE2, reference=chamfer11_side[0])

    # Chamfer12
    chamfer12_edges = [part_2.edges().sort_by_distance(p)[0] for p in [
        (55.914368615, 4.684077712, 5.587878333),
        (55.914368615, 10.145077712, 5.587878333),
    ]]
    chamfer(chamfer12_edges, length=CHAMFER12_SIZE)

    # Sketch35 → Boss-Extrude25 (add)
    with BuildSketch(Plane(origin=(55.914368615, 0, 0), x_dir=(0, 0, -1), z_dir=(1, 0, 0))):
        Polygon((-9.087214589, 9.637077712), (-10.317193213, 10.653077712), (-11.988203901, 10.653077712), (-11.988203901, 9.637077712), align=None)
        Polygon((-7.416203901, 10.653077712), (-10.317193213, 10.653077712), (-9.087214589, 9.637077712), (-7.416203901, 9.637077712), align=None)
        Polygon((-7.416203901, 5.192077712), (-10.317193213, 5.192077712), (-9.087214589, 4.176077712), (-7.416203901, 4.176077712), align=None)
        Polygon((-9.087214589, 4.176077712), (-10.317193213, 5.192077712), (-11.988203901, 5.192077712), (-11.988203901, 4.176077712), align=None)
    extrude(amount=BOSS_EXTRUDE25_DEPTH)


solid = part_2.part
